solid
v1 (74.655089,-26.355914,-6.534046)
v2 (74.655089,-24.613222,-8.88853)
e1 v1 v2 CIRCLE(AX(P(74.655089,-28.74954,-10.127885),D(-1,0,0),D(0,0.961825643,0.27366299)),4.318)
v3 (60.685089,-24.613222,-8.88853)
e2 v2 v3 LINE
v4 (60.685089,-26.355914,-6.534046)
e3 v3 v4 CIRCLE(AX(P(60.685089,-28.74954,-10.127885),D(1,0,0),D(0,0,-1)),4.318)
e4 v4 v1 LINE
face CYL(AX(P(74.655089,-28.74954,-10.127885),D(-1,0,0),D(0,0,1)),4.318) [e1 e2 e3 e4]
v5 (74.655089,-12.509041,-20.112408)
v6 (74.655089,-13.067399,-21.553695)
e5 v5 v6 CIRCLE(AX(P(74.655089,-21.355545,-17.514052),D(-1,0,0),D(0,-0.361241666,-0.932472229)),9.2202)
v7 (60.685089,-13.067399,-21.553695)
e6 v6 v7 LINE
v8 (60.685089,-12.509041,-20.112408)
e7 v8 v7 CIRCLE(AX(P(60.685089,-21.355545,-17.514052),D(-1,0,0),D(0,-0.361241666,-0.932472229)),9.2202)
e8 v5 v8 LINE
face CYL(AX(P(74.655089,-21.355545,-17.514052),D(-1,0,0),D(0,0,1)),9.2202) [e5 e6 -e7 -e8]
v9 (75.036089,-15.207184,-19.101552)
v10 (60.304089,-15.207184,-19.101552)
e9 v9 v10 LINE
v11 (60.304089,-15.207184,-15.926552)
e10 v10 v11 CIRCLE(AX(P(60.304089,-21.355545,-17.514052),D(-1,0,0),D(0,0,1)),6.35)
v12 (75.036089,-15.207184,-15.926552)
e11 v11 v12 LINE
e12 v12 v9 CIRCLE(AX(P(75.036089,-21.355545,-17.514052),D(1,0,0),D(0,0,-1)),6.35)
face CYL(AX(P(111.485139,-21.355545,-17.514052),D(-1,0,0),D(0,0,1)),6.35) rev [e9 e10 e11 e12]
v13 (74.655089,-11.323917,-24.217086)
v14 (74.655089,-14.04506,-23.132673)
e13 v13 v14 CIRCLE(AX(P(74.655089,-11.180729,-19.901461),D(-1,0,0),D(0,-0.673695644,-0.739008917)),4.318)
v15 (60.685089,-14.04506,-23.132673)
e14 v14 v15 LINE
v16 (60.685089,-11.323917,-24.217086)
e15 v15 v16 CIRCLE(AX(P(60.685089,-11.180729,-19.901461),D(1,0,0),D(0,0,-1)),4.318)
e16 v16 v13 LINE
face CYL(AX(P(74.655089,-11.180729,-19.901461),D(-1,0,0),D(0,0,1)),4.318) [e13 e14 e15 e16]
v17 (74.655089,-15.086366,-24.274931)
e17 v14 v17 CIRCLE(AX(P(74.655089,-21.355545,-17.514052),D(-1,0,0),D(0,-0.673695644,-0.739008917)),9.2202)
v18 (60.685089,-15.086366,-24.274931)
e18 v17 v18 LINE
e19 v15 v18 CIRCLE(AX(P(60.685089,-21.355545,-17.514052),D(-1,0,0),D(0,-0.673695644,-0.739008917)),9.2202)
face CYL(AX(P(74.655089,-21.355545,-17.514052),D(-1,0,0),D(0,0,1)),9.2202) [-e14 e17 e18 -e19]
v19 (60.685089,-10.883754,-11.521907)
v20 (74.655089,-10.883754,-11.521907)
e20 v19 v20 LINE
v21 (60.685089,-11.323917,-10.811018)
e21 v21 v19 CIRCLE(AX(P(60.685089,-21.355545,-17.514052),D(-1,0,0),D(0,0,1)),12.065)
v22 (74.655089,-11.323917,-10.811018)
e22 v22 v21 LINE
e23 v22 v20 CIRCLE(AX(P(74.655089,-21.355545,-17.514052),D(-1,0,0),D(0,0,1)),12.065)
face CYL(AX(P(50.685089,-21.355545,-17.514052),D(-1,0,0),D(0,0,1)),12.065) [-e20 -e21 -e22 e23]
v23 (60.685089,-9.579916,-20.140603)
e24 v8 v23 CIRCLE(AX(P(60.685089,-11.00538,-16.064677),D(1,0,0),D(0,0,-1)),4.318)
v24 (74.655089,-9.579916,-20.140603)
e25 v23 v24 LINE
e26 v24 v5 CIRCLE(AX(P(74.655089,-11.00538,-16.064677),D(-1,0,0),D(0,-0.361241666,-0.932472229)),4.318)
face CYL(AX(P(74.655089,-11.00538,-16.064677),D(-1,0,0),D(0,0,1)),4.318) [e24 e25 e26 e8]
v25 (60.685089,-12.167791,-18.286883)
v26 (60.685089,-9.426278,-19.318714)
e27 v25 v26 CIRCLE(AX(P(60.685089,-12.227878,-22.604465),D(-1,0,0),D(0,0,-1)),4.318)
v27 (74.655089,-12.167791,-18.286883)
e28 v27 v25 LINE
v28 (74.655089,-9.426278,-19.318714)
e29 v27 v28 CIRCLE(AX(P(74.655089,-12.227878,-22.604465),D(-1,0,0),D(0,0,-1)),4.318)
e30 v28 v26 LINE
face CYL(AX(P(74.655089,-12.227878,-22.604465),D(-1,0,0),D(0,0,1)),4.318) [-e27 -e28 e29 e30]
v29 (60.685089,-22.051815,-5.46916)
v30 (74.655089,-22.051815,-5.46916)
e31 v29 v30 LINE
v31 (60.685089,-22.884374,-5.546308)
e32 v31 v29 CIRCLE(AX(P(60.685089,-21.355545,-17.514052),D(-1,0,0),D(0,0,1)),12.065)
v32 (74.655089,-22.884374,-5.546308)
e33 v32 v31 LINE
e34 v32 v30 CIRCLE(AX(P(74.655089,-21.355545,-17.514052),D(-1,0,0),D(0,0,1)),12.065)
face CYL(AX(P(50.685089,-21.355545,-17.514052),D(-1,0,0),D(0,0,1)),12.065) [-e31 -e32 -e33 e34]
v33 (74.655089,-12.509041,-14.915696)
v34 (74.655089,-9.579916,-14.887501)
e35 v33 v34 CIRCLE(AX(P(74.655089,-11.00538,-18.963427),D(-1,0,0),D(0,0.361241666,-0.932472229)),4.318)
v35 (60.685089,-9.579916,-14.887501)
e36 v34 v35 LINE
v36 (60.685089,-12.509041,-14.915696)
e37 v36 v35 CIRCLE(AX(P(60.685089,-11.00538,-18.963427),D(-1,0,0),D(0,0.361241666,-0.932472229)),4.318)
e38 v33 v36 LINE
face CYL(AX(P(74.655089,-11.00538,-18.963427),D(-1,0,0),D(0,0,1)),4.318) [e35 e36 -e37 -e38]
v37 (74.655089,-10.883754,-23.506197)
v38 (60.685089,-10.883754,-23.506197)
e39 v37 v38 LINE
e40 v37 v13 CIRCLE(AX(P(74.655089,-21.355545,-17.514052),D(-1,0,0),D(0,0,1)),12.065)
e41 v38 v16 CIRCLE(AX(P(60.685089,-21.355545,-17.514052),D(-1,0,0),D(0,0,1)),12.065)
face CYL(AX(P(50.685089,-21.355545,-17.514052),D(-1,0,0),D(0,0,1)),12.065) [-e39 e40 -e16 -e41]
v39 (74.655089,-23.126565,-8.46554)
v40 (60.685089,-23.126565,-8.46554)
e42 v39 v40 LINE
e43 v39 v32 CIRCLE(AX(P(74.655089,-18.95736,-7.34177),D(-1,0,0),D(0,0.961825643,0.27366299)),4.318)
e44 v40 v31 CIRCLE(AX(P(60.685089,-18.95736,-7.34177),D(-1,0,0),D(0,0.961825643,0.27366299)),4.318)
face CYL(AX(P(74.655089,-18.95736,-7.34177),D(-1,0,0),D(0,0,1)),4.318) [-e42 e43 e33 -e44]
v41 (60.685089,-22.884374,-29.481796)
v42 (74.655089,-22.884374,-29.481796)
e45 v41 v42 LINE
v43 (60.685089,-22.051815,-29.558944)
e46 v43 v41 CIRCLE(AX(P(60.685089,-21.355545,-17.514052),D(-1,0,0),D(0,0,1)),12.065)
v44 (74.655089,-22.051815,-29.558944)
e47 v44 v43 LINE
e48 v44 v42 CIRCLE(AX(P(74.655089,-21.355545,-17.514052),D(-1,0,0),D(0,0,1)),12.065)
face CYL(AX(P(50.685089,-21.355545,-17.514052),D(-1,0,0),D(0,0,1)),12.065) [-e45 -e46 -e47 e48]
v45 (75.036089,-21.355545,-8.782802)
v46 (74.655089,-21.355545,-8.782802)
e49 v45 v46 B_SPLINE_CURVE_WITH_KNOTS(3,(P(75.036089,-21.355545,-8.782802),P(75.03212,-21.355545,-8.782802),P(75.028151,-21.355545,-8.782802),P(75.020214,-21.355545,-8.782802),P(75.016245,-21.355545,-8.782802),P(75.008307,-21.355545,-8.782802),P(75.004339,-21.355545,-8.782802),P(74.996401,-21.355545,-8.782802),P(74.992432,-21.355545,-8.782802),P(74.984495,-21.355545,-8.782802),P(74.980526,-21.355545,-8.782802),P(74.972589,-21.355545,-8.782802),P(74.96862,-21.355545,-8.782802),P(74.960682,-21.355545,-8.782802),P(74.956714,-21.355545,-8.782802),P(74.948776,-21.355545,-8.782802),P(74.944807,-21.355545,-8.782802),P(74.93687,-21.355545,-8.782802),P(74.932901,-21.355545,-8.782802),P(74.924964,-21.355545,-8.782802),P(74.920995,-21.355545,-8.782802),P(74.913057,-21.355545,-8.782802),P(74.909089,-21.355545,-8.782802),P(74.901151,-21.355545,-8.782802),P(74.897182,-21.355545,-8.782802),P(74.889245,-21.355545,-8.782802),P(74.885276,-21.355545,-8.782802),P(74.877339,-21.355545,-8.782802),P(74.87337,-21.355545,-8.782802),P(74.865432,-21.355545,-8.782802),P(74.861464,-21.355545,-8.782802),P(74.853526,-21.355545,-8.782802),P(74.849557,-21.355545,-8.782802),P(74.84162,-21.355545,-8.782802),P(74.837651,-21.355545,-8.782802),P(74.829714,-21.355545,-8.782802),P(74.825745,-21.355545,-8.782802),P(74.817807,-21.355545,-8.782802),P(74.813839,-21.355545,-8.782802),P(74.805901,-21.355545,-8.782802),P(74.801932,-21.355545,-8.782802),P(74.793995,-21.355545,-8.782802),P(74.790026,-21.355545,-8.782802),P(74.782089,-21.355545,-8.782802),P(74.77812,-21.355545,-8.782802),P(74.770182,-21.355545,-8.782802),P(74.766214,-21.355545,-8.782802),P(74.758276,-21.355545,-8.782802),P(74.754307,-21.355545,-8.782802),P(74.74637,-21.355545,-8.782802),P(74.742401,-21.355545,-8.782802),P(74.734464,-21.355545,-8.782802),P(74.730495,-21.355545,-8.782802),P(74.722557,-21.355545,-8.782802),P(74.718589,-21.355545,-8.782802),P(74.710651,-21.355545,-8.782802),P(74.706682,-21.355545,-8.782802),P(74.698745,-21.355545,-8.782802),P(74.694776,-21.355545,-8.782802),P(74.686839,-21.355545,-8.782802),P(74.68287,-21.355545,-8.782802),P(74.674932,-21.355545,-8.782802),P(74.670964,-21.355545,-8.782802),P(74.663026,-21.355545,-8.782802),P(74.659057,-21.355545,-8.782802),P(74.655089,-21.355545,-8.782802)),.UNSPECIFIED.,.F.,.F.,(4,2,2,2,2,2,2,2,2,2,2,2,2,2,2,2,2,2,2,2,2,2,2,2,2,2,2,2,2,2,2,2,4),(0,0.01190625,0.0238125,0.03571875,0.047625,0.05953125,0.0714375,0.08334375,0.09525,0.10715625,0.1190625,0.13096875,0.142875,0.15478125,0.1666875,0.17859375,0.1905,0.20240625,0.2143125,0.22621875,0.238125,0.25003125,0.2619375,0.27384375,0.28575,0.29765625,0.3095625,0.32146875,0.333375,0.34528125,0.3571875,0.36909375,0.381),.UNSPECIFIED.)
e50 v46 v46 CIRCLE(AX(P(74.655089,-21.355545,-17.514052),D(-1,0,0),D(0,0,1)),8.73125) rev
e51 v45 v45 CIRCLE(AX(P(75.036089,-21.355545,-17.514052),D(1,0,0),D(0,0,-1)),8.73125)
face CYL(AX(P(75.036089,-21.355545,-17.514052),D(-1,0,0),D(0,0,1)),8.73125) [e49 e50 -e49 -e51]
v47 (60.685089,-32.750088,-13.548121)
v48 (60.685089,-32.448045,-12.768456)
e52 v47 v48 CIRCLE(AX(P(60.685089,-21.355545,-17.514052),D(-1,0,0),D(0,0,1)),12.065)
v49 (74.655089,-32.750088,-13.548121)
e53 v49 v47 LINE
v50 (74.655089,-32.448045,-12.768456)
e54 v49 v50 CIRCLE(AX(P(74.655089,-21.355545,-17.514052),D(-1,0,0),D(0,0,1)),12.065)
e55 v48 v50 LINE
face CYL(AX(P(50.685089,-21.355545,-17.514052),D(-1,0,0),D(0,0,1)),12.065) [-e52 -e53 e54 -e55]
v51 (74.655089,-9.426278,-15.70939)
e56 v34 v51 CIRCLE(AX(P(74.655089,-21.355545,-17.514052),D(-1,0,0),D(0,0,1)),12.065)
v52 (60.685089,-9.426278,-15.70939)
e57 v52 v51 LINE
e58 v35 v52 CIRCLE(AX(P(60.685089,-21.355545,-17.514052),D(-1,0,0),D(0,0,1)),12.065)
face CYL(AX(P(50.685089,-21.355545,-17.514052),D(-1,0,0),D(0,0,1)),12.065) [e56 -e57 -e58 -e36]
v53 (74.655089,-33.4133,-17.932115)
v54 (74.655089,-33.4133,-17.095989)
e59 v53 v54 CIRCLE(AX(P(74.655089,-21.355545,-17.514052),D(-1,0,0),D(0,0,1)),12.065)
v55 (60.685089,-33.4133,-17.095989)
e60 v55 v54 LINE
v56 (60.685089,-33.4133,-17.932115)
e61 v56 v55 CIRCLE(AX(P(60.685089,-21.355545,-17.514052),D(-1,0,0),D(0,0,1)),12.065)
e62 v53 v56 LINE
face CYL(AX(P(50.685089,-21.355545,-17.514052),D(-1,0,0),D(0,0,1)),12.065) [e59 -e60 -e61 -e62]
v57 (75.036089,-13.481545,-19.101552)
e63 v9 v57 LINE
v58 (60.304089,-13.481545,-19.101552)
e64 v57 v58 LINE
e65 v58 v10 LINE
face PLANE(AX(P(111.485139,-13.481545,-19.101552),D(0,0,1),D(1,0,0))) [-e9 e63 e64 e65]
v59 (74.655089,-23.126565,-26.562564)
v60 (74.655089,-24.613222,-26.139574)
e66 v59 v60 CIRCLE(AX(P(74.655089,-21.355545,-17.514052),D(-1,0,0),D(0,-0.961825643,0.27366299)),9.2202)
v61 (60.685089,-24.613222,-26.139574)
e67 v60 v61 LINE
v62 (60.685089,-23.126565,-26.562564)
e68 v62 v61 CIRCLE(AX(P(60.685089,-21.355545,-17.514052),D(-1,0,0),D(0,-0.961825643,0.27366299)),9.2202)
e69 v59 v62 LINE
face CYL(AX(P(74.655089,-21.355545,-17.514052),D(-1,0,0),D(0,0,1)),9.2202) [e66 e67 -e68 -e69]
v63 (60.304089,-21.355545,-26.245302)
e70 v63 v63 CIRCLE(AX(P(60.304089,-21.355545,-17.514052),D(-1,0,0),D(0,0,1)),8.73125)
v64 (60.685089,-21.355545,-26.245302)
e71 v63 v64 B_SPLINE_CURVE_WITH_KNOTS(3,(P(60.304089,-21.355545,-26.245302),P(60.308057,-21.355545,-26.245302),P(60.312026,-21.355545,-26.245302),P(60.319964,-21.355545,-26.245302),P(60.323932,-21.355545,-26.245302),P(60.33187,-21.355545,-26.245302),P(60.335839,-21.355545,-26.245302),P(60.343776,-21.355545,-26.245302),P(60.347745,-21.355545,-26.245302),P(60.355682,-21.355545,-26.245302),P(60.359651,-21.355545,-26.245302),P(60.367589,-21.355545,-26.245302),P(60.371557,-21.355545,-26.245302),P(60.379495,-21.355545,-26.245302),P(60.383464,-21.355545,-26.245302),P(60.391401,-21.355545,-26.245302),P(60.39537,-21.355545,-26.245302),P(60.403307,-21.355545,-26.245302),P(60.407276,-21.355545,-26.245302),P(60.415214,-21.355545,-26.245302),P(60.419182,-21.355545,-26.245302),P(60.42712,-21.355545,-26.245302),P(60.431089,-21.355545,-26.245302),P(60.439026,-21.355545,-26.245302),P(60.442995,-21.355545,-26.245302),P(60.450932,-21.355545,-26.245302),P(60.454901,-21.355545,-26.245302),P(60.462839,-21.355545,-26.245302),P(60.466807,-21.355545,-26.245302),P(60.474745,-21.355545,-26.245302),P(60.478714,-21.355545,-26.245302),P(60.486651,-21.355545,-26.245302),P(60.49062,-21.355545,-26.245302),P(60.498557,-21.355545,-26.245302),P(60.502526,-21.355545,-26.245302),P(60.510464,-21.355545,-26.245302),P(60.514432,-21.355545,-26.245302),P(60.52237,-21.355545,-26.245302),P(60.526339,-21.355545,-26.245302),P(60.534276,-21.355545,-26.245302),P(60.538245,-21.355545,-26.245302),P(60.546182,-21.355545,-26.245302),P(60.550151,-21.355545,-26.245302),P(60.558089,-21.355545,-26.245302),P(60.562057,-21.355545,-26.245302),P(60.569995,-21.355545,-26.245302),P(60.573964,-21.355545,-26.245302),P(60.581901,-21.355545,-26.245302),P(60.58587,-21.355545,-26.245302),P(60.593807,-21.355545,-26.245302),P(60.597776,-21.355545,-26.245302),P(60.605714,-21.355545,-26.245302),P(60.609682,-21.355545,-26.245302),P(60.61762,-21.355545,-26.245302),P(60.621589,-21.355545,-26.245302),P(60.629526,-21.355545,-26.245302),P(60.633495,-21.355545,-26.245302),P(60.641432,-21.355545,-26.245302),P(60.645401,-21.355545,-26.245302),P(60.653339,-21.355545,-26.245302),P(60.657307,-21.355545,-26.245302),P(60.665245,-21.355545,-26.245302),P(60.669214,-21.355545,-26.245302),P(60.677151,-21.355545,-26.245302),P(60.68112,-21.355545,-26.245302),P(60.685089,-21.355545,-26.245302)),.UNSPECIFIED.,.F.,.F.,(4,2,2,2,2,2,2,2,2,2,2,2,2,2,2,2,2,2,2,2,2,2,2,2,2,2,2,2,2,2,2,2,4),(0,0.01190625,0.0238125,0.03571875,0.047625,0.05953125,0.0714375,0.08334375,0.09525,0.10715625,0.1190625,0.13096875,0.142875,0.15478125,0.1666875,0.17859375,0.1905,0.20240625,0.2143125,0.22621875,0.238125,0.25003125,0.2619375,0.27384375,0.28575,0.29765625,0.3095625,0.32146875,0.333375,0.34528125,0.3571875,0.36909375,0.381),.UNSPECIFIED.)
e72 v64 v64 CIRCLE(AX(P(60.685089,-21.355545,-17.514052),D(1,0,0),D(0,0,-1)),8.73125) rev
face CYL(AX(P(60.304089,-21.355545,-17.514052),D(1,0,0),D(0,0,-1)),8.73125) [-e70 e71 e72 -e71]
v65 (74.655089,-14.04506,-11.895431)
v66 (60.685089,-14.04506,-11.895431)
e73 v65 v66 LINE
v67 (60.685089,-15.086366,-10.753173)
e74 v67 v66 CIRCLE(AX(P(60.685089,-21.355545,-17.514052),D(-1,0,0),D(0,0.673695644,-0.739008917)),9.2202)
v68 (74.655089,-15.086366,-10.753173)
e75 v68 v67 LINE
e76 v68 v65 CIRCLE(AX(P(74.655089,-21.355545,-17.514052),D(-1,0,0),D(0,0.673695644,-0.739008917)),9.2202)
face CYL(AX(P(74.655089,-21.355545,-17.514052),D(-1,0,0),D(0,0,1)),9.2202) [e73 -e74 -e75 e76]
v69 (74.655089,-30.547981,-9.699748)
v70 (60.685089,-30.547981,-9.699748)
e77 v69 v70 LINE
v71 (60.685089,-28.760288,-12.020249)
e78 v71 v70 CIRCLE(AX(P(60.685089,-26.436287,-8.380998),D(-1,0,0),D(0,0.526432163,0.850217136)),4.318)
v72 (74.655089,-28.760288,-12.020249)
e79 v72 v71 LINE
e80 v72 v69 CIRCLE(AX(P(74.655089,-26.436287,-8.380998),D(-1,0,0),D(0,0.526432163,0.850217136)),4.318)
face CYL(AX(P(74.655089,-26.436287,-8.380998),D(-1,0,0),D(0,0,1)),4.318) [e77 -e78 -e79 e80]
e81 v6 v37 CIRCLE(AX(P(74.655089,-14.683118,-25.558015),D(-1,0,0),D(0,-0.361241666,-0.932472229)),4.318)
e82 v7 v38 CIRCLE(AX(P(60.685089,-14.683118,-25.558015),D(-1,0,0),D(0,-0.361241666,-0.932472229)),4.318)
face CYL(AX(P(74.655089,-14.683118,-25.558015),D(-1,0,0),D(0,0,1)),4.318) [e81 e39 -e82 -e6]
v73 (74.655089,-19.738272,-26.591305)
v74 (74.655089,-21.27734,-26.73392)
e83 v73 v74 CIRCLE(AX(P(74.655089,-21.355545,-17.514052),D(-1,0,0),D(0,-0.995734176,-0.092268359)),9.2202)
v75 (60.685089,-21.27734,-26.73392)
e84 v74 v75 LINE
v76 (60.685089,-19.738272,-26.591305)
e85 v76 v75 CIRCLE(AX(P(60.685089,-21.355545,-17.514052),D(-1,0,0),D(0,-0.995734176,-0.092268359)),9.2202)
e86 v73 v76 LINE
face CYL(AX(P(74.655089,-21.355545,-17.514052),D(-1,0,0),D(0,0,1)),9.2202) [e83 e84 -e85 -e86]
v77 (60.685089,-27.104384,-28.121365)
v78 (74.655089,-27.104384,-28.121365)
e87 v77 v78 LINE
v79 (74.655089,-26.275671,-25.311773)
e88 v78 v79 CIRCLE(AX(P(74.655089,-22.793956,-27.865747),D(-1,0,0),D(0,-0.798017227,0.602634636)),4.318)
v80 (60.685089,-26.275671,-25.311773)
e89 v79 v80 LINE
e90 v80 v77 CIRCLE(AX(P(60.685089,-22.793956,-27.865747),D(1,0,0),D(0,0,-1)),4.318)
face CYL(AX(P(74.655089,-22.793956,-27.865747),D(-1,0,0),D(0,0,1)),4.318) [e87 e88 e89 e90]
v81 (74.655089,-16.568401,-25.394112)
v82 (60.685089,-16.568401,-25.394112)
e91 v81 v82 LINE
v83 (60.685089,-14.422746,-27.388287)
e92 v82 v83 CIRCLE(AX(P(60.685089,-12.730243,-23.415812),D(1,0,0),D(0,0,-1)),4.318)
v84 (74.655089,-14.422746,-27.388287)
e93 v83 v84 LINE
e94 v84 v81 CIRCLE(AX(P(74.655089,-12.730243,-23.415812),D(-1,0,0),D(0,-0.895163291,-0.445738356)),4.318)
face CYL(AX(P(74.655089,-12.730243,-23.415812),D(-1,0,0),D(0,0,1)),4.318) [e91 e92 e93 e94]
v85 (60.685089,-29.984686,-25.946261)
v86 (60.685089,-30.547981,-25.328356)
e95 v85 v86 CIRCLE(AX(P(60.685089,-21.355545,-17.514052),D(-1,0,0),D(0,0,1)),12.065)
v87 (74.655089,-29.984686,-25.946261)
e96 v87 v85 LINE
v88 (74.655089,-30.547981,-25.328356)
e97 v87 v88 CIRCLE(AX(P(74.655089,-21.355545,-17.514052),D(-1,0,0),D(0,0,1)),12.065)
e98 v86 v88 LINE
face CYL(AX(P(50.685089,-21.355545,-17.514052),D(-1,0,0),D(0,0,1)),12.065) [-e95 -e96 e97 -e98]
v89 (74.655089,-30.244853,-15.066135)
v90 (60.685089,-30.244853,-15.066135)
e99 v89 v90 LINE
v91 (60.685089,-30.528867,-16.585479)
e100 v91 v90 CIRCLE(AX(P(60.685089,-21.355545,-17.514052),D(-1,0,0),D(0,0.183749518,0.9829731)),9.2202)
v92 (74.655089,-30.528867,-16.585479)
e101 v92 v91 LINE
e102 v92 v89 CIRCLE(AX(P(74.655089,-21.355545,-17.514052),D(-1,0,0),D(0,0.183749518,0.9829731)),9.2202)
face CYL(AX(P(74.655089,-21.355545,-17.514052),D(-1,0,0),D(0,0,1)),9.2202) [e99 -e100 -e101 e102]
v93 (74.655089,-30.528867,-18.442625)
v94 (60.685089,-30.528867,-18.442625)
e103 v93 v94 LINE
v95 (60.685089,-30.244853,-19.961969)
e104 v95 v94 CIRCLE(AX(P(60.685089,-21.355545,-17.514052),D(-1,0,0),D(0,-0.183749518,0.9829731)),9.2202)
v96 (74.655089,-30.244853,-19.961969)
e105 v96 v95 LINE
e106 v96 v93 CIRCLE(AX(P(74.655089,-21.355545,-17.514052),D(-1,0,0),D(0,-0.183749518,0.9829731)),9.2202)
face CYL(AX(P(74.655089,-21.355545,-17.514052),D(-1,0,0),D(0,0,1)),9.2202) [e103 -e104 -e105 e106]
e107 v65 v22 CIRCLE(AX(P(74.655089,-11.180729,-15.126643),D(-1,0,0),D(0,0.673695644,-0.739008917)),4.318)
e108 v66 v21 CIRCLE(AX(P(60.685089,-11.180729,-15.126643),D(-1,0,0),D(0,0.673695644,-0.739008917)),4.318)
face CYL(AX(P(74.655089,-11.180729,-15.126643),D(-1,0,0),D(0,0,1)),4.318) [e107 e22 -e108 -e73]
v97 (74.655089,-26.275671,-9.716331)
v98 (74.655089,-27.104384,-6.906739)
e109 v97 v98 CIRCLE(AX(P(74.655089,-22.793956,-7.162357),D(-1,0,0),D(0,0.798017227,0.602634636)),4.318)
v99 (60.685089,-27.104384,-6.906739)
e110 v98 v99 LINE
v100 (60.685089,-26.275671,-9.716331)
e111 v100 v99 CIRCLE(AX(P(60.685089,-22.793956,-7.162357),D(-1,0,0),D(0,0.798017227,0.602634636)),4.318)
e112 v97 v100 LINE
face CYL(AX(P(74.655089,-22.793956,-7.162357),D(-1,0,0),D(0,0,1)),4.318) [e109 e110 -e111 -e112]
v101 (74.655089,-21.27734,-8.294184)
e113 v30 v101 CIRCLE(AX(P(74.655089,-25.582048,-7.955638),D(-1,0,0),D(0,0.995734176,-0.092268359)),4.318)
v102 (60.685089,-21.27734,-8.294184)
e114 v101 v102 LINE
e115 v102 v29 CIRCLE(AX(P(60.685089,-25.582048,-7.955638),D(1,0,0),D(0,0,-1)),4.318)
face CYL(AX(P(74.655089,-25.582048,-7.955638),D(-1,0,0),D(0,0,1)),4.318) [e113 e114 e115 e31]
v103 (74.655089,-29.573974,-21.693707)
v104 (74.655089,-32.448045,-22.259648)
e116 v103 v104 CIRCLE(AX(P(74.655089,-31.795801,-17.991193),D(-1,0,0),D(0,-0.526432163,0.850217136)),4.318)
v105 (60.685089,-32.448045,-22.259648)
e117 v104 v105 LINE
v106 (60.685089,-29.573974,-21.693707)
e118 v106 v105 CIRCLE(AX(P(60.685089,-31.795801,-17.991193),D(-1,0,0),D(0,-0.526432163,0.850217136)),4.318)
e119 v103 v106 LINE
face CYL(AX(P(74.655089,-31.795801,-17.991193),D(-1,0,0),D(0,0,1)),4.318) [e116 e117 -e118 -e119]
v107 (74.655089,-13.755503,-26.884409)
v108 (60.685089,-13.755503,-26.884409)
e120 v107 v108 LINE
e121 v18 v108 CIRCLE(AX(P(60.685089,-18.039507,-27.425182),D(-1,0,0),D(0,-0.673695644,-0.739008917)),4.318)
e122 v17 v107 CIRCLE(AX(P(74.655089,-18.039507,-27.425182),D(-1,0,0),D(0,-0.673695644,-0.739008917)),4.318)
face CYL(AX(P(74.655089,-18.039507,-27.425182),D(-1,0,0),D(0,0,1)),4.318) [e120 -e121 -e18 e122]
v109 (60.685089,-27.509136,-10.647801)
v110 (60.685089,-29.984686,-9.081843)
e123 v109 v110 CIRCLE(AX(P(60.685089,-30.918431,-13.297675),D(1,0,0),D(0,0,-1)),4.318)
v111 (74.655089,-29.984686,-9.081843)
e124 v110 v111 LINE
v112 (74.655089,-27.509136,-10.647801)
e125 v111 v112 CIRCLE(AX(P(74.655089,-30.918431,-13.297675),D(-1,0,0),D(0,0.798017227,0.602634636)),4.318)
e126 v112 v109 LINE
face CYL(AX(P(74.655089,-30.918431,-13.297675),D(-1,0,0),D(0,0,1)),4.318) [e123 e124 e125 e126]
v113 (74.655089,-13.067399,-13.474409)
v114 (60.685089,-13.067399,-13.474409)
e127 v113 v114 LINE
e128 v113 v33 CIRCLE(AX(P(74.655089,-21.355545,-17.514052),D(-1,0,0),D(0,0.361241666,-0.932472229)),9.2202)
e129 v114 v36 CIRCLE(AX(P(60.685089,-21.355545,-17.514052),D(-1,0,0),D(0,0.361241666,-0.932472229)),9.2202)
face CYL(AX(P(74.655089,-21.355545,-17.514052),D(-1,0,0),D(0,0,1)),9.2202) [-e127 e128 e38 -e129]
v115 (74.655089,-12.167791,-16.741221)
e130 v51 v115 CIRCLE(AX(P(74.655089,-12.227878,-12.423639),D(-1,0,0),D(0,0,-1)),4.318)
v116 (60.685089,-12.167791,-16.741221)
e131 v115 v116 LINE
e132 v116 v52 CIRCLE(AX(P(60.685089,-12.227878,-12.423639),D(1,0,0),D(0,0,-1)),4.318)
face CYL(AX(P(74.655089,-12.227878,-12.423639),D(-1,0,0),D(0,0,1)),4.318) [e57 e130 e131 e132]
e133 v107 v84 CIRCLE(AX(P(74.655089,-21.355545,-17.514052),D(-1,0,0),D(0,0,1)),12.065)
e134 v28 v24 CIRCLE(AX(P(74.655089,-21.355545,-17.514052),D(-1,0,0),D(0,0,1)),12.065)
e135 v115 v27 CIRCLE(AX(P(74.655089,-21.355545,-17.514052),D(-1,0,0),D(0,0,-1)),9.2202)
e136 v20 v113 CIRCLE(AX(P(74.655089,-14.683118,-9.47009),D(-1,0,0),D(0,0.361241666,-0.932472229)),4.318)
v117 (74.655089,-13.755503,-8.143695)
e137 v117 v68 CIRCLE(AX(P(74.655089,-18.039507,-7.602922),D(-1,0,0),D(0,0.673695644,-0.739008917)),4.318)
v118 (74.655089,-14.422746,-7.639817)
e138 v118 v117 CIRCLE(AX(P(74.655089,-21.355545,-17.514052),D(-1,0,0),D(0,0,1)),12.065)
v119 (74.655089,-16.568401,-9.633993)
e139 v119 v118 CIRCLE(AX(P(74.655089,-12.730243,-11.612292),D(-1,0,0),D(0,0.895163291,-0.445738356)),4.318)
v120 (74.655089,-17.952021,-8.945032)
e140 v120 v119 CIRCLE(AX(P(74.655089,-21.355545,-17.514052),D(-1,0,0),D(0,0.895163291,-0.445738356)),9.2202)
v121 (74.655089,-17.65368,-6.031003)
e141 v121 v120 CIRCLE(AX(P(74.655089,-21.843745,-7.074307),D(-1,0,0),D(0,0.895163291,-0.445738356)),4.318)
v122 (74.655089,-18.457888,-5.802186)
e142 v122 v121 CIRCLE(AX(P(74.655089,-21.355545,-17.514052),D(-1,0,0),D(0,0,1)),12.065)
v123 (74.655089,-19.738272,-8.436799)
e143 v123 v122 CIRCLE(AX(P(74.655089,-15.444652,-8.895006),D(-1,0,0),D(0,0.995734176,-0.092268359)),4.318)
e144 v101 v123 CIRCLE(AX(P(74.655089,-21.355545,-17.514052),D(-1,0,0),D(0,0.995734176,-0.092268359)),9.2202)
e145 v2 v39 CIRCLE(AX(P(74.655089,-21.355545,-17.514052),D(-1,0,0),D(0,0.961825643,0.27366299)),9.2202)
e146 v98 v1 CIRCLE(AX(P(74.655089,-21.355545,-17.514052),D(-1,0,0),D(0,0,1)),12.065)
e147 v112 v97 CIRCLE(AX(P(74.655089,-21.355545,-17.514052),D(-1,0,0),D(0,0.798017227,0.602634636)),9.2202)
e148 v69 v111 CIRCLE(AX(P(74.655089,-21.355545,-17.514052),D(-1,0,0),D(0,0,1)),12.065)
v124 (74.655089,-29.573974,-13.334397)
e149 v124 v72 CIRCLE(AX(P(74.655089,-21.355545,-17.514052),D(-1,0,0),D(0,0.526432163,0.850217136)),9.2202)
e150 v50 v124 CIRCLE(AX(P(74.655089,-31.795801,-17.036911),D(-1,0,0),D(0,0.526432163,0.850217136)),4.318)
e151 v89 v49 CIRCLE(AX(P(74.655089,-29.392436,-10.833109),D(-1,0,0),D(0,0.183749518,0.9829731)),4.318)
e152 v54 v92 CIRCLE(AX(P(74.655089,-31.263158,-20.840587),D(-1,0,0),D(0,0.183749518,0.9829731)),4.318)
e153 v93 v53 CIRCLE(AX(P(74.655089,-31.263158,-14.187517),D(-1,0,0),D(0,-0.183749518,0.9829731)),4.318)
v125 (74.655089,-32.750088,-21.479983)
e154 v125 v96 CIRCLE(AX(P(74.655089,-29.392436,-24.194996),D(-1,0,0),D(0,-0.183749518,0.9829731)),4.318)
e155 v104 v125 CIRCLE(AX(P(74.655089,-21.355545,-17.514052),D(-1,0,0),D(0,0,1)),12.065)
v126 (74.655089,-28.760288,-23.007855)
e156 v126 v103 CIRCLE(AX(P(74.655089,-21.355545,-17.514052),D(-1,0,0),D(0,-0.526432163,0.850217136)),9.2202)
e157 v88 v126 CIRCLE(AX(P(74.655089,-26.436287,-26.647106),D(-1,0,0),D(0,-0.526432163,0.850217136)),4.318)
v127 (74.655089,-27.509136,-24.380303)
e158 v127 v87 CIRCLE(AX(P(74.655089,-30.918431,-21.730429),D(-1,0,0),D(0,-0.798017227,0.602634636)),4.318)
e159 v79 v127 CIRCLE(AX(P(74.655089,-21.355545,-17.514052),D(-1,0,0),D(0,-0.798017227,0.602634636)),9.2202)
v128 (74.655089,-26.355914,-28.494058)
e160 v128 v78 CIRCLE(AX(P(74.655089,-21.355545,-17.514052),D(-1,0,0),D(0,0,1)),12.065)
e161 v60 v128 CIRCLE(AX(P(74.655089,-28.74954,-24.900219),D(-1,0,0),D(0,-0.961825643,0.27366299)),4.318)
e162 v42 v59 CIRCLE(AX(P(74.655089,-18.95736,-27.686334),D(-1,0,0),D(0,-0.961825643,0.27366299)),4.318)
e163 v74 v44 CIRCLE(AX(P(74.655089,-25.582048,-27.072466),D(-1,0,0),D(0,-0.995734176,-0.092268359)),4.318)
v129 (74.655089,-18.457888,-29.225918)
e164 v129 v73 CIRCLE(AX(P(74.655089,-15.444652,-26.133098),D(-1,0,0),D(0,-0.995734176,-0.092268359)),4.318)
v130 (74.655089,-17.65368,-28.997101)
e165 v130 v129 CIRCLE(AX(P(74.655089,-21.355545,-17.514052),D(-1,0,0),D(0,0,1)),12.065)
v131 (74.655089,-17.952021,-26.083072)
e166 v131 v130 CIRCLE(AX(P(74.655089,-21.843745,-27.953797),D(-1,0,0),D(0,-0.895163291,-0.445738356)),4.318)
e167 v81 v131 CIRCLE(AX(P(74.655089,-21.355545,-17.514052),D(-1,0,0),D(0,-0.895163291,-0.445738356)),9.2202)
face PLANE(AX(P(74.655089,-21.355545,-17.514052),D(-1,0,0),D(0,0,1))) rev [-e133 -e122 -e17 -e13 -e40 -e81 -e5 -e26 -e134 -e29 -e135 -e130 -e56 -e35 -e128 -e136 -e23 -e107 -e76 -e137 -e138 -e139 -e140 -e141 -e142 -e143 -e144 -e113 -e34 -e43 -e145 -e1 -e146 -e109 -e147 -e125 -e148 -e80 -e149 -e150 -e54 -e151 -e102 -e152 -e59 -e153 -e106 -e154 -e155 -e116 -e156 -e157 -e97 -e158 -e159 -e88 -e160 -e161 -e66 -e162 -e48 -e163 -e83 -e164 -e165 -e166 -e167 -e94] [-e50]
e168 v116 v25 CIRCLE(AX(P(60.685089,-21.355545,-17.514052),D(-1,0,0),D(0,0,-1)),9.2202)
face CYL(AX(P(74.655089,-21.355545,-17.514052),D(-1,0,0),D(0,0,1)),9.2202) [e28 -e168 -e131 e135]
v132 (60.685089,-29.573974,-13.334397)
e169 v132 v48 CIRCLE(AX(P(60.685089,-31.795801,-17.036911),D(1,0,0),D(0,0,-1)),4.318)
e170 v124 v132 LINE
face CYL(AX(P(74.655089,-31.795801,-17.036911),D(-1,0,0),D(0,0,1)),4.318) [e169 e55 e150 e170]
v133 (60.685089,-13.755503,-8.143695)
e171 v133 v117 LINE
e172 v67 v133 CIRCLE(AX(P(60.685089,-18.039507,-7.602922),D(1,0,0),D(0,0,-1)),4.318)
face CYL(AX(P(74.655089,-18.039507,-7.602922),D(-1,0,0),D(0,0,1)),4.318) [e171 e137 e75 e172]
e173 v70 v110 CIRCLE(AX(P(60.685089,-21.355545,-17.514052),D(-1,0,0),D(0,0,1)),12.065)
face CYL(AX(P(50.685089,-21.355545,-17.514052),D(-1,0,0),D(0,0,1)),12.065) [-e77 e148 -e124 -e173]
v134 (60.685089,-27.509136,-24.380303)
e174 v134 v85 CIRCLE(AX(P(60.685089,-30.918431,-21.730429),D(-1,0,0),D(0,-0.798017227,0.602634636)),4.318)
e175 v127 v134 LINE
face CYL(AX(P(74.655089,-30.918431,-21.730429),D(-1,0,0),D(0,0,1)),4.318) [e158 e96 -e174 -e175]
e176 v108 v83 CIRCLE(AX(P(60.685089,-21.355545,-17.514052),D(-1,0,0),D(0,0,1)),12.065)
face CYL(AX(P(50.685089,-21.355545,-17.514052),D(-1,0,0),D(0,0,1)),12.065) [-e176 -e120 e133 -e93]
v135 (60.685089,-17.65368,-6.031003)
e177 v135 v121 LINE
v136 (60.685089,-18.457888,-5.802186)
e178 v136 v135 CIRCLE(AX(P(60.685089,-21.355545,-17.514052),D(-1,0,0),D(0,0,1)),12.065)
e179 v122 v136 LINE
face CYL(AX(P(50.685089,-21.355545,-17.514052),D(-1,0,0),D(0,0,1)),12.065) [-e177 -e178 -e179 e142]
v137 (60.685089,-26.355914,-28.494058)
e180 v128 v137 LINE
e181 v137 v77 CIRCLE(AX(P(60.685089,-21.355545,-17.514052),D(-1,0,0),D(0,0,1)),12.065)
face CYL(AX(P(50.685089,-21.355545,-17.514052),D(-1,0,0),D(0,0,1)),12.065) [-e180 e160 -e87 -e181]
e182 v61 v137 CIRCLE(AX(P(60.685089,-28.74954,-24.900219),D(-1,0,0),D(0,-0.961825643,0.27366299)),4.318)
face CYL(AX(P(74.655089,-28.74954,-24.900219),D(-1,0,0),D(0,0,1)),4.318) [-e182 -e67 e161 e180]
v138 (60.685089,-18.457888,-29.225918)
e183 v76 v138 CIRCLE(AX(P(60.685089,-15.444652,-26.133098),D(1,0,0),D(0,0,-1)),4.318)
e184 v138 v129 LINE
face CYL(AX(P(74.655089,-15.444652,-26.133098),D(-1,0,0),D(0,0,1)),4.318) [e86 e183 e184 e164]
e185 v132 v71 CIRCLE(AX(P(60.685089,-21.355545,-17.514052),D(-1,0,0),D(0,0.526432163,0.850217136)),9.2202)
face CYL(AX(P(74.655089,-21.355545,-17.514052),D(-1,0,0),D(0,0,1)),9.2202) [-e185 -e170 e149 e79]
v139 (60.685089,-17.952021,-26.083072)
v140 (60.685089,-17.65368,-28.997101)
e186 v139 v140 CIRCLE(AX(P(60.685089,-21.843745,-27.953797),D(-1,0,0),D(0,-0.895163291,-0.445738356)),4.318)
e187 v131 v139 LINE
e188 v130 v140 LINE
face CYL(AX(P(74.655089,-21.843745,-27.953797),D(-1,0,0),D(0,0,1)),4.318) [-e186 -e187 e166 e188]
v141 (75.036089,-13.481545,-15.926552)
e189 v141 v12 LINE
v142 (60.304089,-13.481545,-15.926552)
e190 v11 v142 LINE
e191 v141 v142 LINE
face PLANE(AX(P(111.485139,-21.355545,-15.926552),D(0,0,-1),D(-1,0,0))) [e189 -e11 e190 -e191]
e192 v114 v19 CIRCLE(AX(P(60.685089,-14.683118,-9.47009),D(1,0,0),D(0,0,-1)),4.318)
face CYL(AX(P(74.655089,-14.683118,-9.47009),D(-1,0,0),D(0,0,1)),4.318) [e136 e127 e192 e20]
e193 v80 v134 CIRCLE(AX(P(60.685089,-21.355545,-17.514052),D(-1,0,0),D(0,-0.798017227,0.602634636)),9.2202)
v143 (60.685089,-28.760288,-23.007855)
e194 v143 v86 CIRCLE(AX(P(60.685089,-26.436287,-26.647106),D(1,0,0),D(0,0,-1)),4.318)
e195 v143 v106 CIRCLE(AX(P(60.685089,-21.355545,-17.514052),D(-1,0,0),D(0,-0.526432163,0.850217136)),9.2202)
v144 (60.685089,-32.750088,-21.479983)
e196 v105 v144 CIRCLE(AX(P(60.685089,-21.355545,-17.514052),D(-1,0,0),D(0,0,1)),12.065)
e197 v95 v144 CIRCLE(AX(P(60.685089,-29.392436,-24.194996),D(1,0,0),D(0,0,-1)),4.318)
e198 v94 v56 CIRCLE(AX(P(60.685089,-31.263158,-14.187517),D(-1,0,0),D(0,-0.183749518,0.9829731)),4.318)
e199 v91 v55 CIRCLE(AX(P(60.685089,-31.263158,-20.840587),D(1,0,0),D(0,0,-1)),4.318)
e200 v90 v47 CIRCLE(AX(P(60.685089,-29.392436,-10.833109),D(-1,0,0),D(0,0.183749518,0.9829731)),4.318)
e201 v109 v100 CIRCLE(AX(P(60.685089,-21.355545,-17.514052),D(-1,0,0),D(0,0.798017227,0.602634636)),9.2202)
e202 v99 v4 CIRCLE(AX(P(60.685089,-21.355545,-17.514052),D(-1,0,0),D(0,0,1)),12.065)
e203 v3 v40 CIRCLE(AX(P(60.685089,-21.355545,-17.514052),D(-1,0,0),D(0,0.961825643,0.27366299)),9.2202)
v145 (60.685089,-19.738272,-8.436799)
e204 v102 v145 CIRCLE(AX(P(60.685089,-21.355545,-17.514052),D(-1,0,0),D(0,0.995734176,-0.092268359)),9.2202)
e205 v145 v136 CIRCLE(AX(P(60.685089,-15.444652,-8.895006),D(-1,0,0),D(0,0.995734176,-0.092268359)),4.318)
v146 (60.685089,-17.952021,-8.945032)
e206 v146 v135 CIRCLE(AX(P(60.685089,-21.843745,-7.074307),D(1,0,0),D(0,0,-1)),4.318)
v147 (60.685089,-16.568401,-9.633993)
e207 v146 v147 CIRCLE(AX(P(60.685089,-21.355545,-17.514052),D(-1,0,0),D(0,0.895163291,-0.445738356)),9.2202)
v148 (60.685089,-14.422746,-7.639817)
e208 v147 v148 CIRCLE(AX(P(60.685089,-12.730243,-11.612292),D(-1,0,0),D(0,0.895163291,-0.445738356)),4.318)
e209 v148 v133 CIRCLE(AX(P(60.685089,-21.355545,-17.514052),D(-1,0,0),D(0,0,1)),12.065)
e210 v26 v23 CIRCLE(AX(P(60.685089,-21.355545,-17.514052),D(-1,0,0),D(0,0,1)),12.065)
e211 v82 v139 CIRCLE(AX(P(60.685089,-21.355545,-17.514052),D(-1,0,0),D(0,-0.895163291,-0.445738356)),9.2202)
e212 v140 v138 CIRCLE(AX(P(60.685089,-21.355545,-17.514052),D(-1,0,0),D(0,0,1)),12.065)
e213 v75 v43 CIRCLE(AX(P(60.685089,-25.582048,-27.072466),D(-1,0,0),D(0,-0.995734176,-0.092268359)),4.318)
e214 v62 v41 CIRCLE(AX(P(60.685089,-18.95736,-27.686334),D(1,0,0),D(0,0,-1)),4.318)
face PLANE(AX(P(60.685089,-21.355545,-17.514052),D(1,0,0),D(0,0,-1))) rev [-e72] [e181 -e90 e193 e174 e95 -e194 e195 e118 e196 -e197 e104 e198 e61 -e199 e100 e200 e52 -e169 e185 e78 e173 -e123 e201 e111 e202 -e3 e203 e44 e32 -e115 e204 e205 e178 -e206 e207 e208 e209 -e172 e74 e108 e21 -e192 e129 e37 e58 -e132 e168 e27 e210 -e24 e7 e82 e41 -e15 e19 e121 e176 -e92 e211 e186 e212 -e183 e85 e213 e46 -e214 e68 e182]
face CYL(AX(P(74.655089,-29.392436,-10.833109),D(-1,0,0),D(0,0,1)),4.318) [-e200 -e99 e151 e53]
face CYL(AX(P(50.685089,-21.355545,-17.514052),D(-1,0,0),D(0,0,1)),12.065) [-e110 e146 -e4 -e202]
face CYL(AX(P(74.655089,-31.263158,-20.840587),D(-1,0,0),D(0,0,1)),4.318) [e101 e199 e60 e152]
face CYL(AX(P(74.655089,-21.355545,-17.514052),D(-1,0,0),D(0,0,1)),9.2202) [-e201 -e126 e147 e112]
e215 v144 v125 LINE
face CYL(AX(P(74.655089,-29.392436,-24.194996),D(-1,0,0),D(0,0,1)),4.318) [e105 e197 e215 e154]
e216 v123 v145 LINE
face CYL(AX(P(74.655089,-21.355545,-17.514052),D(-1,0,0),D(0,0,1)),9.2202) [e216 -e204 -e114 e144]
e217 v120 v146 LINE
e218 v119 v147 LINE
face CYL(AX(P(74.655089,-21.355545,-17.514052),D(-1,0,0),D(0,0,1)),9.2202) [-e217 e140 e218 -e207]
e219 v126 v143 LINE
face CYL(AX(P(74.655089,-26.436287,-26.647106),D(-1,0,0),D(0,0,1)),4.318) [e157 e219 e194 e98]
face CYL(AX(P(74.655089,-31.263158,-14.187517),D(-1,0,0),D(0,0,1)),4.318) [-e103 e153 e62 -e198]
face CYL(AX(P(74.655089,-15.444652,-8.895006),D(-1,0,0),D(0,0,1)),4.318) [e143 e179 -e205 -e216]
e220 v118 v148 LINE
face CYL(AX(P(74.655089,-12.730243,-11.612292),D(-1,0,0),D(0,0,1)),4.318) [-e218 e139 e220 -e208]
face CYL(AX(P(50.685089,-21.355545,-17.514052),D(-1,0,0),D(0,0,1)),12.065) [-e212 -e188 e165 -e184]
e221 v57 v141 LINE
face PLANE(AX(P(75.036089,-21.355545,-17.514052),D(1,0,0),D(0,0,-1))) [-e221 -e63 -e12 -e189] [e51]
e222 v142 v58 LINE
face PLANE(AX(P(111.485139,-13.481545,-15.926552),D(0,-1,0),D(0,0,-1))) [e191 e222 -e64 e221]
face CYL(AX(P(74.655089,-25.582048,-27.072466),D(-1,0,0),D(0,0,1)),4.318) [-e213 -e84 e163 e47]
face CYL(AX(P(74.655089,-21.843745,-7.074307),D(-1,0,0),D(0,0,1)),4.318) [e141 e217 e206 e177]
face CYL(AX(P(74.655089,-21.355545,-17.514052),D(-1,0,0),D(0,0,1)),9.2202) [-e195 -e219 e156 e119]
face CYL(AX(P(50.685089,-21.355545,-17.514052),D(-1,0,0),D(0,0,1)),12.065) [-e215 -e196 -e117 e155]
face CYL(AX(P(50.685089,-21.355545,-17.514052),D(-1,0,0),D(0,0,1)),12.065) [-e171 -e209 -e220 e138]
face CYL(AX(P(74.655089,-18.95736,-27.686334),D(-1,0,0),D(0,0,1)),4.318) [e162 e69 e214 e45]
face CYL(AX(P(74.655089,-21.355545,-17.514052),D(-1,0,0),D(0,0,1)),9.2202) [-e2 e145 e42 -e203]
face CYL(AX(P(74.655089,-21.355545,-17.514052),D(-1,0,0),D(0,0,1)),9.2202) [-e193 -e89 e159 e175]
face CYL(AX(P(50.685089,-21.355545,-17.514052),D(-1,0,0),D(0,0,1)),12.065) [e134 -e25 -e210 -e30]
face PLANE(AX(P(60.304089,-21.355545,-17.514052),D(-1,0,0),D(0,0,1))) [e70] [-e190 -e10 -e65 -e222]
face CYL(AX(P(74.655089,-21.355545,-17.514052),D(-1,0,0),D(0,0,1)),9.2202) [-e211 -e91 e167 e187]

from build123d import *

# Parameters (mm, degrees)
SPUR_START          = 60.68508869
SPUR_GEAR_AI_DEPTH  = 13.97
SKETCH1_R           = 8.73125
BOSS_EXTRUDE1_DEPTH = 0.381
BOSS_EXTRUDE2_START = 0.381
SKETCH2_R           = 8.73125
BOSS_EXTRUDE2_DEPTH = 0.381


# Read off the part's stored shape, not the designer's step: spur gear_ai
with BuildPart() as part:
    # spur gear_ai outline → spur gear_ai (new body)
    with BuildSketch(Plane.YZ.offset(SPUR_START)):
        with BuildLine():
            ThreePointArc((-11.323917399, -24.217086363), (-11.097675416, -23.865456059), (-10.883753605, -23.506197427))
            ThreePointArc((-10.883753605, -23.506197427), (-11.804950291, -22.339121223), (-13.067398654, -21.553695012))
            ThreePointArc((-13.067398654, -21.553695012), (-12.757964709, -20.844772424), (-12.509041094, -20.112408009))
            ThreePointArc((-12.509041094, -20.112408009), (-11.04694228, -20.382476998), (-9.57991556, -20.14060347))
            ThreePointArc((-9.57991556, -20.14060347), (-9.495974711, -19.730989946), (-9.42627775, -19.318713778))
            ThreePointArc((-9.42627775, -19.318713778), (-10.70686463, -18.563222253), (-12.167791342, -18.286883074))
            ThreePointArc((-12.167791342, -18.286883074), (-12.135345159, -17.514052013), (-12.167791342, -16.741220953))
            ThreePointArc((-12.167791342, -16.741220953), (-10.70686463, -16.464881774), (-9.42627775, -15.709390249))
            ThreePointArc((-9.42627775, -15.709390249), (-9.495974711, -15.297114081), (-9.57991556, -14.887500557))
            ThreePointArc((-9.57991556, -14.887500557), (-11.04694228, -14.645627029), (-12.509041094, -14.915696018))
            ThreePointArc((-12.509041094, -14.915696018), (-12.757964709, -14.183331603), (-13.067398654, -13.474409015))
            ThreePointArc((-13.067398654, -13.474409015), (-11.804950291, -12.688982804), (-10.883753605, -11.5219066))
            ThreePointArc((-10.883753605, -11.5219066), (-11.097675416, -11.162647968), (-11.323917399, -10.811017664))
            ThreePointArc((-11.323917399, -10.811017664), (-12.779253872, -11.115428493), (-14.045060241, -11.895431337))
            ThreePointArc((-14.045060241, -11.895431337), (-14.54173514, -11.302443439), (-15.086366078, -10.753173247))
            ThreePointArc((-15.086366078, -10.753173247), (-14.192896711, -9.564736168), (-13.755502936, -8.143695392))
            ThreePointArc((-13.755502936, -8.143695392), (-14.084758271, -7.885974166), (-14.422746154, -7.639816704))
            ThreePointArc((-14.422746154, -7.639816704), (-15.669841124, -8.44939952), (-16.568400884, -9.633992513))
            ThreePointArc((-16.568400884, -9.633992513), (-17.245748371, -9.260467435), (-17.952020875, -8.945031621))
            ThreePointArc((-17.952020875, -8.945031621), (-17.548198493, -7.514088685), (-17.653680083, -6.031002769))
            ThreePointArc((-17.653680083, -6.031002769), (-18.053801184, -5.909625629), (-18.45788783, -5.802185936))
            ThreePointArc((-18.45788783, -5.802185936), (-19.328314212, -7.007602095), (-19.738271888, -8.436799389))
            ThreePointArc((-19.738271888, -8.436799389), (-20.504812431, -8.333183761), (-21.277340486, -8.294183681))
            ThreePointArc((-21.277340486, -8.294183681), (-21.41770354, -6.813991662), (-22.051814621, -5.469159576))
            ThreePointArc((-22.051814621, -5.469159576), (-22.468762916, -5.500519177), (-22.884374185, -5.546307581))
            ThreePointArc((-22.884374185, -5.546307581), (-23.260576072, -6.98475895), (-23.126564609, -8.465539531))
            ThreePointArc((-23.126564609, -8.465539531), (-23.87877266, -8.645827218), (-24.613222072, -8.888530048))
            ThreePointArc((-24.613222072, -8.888530048), (-25.278813753, -7.55899708), (-26.355914109, -6.53404585))
            ThreePointArc((-26.355914109, -6.53404585), (-26.733378421, -6.713906903), (-27.104383709, -6.906739426))
            ThreePointArc((-27.104383709, -6.906739426), (-26.935552952, -8.383955178), (-26.275671339, -9.716331423))
            ThreePointArc((-26.275671339, -9.716331423), (-26.911957033, -10.156173575), (-27.509136339, -10.647800953))
            ThreePointArc((-27.509136339, -10.647800953), (-28.610064803, -9.648487829), (-29.984686063, -9.081842798))
            ThreePointArc((-29.984686063, -9.081842798), (-30.271687745, -9.385914073), (-30.547980731, -9.699747614))
            ThreePointArc((-30.547980731, -9.699747614), (-29.856918859, -11.016221575), (-28.760287766, -12.020248689))
            ThreePointArc((-28.760287766, -12.020248689), (-29.194717194, -12.660242185), (-29.573974019, -13.33439711))
            ThreePointArc((-29.573974019, -13.33439711), (-30.961552776, -12.800266607), (-32.448044722, -12.768456326))
            ThreePointArc((-32.448044722, -12.768456326), (-32.605822607, -13.155671311), (-32.750088392, -13.548120911))
            ThreePointArc((-32.750088392, -13.548120911), (-31.63012714, -14.526055979), (-30.244852672, -15.066134537))
            ThreePointArc((-30.244852672, -15.066134537), (-30.418753733, -15.819844709), (-30.528867342, -16.585478823))
            ThreePointArc((-30.528867342, -16.585478823), (-32.015696192, -16.588668223), (-33.41329985, -17.095988847))
            ThreePointArc((-33.41329985, -17.095988847), (-33.420545159, -17.514052013), (-33.41329985, -17.93211518))
            ThreePointArc((-33.41329985, -17.93211518), (-32.015696192, -18.439435804), (-30.528867342, -18.442625204))
            ThreePointArc((-30.528867342, -18.442625204), (-30.418753733, -19.208259318), (-30.244852672, -19.96196949))
            ThreePointArc((-30.244852672, -19.96196949), (-31.63012714, -20.502048048), (-32.750088392, -21.479983116))
            ThreePointArc((-32.750088392, -21.479983116), (-32.605822607, -21.872432716), (-32.448044722, -22.259647701))
            ThreePointArc((-32.448044722, -22.259647701), (-30.961552776, -22.22783742), (-29.573974019, -21.693706917))
            ThreePointArc((-29.573974019, -21.693706917), (-29.194717194, -22.367861842), (-28.760287766, -23.007855338))
            ThreePointArc((-28.760287766, -23.007855338), (-29.856918859, -24.011882452), (-30.547980731, -25.328356413))
            ThreePointArc((-30.547980731, -25.328356413), (-30.271687745, -25.642189954), (-29.984686063, -25.946261229))
            ThreePointArc((-29.984686063, -25.946261229), (-28.610064803, -25.379616198), (-27.509136339, -24.380303074))
            ThreePointArc((-27.509136339, -24.380303074), (-26.911957033, -24.871930452), (-26.275671339, -25.311772604))
            ThreePointArc((-26.275671339, -25.311772604), (-26.935552952, -26.644148849), (-27.104383709, -28.121364601))
            ThreePointArc((-27.104383709, -28.121364601), (-26.733378421, -28.314197124), (-26.355914109, -28.494058177))
            ThreePointArc((-26.355914109, -28.494058177), (-25.278813753, -27.469106947), (-24.613222072, -26.139573979))
            ThreePointArc((-24.613222072, -26.139573979), (-23.87877266, -26.382276809), (-23.126564609, -26.562564496))
            ThreePointArc((-23.126564609, -26.562564496), (-23.260576072, -28.043345077), (-22.884374185, -29.481796446))
            ThreePointArc((-22.884374185, -29.481796446), (-22.468762916, -29.527584851), (-22.051814621, -29.558944451))
            ThreePointArc((-22.051814621, -29.558944451), (-21.41770354, -28.214112365), (-21.277340486, -26.733920346))
            ThreePointArc((-21.277340486, -26.733920346), (-20.504812431, -26.694920266), (-19.738271888, -26.591304638))
            ThreePointArc((-19.738271888, -26.591304638), (-19.328314212, -28.020501932), (-18.45788783, -29.225918091))
            ThreePointArc((-18.45788783, -29.225918091), (-18.053801184, -29.118478398), (-17.653680083, -28.997101258))
            ThreePointArc((-17.653680083, -28.997101258), (-17.548198493, -27.514015342), (-17.952020875, -26.083072406))
            ThreePointArc((-17.952020875, -26.083072406), (-17.245748371, -25.767636592), (-16.568400884, -25.394111514))
            ThreePointArc((-16.568400884, -25.394111514), (-15.669841124, -26.578704507), (-14.422746154, -27.388287323))
            ThreePointArc((-14.422746154, -27.388287323), (-14.084758271, -27.142129861), (-13.755502936, -26.884408635))
            ThreePointArc((-13.755502936, -26.884408635), (-14.192896711, -25.463367859), (-15.086366078, -24.27493078))
            ThreePointArc((-15.086366078, -24.27493078), (-14.54173514, -23.725660588), (-14.045060241, -23.13267269))
            ThreePointArc((-14.045060241, -23.13267269), (-12.779253872, -23.912675534), (-11.323917399, -24.217086363))
        make_face()
        with BuildLine():
            Line((-13.481545159, -19.101552014), (-15.207184097, -19.101552014))
            ThreePointArc((-15.207184097, -19.101552014), (-27.705545159, -17.514052014), (-15.207184097, -15.926552014))
            Line((-15.207184097, -15.926552014), (-13.481545159, -15.926552014))
            Line((-13.481545159, -15.926552014), (-13.481545159, -19.101552014))
        make_face(mode=Mode.SUBTRACT)
    extrude(amount=SPUR_GEAR_AI_DEPTH)

    # Sketch1 → Boss-Extrude1 (add)
    with BuildSketch(Plane(origin=(74.65508869, 0, 0), x_dir=(0, 0, -1), z_dir=(1, 0, 0))):
        with Locations(Location((17.514052014, -21.355545159, 0), (0, 0, 180))):
            Circle(SKETCH1_R)
        with BuildLine():
            Line((15.926552014, -13.481545159), (15.926552014, -15.207184097))
            ThreePointArc((15.926552014, -15.207184097), (17.514052014, -27.705545159), (19.101552014, -15.207184097))
            Line((19.101552014, -15.207184097), (19.101552014, -13.481545159))
            Line((19.101552014, -13.481545159), (15.926552014, -13.481545159))
        make_face(mode=Mode.SUBTRACT)
    extrude(amount=BOSS_EXTRUDE1_DEPTH)

    # Sketch2 → Boss-Extrude2 (add)
    with BuildSketch(Plane.ZY.offset(-60.68508869).offset(BOSS_EXTRUDE2_START)):
        with Locations((-17.514052014, -21.355545159)):
            Circle(SKETCH2_R)
        with BuildLine():
            Line((-19.101552014, -13.481545159), (-19.101552014, -15.207184097))
            ThreePointArc((-19.101552014, -15.207184097), (-17.514052014, -27.705545159), (-15.926552014, -15.207184097))
            Line((-15.926552014, -15.207184097), (-15.926552014, -13.481545159))
            Line((-15.926552014, -13.481545159), (-19.101552014, -13.481545159))
        make_face(mode=Mode.SUBTRACT)
    extrude(amount=-BOSS_EXTRUDE2_DEPTH)


solid = part.part
